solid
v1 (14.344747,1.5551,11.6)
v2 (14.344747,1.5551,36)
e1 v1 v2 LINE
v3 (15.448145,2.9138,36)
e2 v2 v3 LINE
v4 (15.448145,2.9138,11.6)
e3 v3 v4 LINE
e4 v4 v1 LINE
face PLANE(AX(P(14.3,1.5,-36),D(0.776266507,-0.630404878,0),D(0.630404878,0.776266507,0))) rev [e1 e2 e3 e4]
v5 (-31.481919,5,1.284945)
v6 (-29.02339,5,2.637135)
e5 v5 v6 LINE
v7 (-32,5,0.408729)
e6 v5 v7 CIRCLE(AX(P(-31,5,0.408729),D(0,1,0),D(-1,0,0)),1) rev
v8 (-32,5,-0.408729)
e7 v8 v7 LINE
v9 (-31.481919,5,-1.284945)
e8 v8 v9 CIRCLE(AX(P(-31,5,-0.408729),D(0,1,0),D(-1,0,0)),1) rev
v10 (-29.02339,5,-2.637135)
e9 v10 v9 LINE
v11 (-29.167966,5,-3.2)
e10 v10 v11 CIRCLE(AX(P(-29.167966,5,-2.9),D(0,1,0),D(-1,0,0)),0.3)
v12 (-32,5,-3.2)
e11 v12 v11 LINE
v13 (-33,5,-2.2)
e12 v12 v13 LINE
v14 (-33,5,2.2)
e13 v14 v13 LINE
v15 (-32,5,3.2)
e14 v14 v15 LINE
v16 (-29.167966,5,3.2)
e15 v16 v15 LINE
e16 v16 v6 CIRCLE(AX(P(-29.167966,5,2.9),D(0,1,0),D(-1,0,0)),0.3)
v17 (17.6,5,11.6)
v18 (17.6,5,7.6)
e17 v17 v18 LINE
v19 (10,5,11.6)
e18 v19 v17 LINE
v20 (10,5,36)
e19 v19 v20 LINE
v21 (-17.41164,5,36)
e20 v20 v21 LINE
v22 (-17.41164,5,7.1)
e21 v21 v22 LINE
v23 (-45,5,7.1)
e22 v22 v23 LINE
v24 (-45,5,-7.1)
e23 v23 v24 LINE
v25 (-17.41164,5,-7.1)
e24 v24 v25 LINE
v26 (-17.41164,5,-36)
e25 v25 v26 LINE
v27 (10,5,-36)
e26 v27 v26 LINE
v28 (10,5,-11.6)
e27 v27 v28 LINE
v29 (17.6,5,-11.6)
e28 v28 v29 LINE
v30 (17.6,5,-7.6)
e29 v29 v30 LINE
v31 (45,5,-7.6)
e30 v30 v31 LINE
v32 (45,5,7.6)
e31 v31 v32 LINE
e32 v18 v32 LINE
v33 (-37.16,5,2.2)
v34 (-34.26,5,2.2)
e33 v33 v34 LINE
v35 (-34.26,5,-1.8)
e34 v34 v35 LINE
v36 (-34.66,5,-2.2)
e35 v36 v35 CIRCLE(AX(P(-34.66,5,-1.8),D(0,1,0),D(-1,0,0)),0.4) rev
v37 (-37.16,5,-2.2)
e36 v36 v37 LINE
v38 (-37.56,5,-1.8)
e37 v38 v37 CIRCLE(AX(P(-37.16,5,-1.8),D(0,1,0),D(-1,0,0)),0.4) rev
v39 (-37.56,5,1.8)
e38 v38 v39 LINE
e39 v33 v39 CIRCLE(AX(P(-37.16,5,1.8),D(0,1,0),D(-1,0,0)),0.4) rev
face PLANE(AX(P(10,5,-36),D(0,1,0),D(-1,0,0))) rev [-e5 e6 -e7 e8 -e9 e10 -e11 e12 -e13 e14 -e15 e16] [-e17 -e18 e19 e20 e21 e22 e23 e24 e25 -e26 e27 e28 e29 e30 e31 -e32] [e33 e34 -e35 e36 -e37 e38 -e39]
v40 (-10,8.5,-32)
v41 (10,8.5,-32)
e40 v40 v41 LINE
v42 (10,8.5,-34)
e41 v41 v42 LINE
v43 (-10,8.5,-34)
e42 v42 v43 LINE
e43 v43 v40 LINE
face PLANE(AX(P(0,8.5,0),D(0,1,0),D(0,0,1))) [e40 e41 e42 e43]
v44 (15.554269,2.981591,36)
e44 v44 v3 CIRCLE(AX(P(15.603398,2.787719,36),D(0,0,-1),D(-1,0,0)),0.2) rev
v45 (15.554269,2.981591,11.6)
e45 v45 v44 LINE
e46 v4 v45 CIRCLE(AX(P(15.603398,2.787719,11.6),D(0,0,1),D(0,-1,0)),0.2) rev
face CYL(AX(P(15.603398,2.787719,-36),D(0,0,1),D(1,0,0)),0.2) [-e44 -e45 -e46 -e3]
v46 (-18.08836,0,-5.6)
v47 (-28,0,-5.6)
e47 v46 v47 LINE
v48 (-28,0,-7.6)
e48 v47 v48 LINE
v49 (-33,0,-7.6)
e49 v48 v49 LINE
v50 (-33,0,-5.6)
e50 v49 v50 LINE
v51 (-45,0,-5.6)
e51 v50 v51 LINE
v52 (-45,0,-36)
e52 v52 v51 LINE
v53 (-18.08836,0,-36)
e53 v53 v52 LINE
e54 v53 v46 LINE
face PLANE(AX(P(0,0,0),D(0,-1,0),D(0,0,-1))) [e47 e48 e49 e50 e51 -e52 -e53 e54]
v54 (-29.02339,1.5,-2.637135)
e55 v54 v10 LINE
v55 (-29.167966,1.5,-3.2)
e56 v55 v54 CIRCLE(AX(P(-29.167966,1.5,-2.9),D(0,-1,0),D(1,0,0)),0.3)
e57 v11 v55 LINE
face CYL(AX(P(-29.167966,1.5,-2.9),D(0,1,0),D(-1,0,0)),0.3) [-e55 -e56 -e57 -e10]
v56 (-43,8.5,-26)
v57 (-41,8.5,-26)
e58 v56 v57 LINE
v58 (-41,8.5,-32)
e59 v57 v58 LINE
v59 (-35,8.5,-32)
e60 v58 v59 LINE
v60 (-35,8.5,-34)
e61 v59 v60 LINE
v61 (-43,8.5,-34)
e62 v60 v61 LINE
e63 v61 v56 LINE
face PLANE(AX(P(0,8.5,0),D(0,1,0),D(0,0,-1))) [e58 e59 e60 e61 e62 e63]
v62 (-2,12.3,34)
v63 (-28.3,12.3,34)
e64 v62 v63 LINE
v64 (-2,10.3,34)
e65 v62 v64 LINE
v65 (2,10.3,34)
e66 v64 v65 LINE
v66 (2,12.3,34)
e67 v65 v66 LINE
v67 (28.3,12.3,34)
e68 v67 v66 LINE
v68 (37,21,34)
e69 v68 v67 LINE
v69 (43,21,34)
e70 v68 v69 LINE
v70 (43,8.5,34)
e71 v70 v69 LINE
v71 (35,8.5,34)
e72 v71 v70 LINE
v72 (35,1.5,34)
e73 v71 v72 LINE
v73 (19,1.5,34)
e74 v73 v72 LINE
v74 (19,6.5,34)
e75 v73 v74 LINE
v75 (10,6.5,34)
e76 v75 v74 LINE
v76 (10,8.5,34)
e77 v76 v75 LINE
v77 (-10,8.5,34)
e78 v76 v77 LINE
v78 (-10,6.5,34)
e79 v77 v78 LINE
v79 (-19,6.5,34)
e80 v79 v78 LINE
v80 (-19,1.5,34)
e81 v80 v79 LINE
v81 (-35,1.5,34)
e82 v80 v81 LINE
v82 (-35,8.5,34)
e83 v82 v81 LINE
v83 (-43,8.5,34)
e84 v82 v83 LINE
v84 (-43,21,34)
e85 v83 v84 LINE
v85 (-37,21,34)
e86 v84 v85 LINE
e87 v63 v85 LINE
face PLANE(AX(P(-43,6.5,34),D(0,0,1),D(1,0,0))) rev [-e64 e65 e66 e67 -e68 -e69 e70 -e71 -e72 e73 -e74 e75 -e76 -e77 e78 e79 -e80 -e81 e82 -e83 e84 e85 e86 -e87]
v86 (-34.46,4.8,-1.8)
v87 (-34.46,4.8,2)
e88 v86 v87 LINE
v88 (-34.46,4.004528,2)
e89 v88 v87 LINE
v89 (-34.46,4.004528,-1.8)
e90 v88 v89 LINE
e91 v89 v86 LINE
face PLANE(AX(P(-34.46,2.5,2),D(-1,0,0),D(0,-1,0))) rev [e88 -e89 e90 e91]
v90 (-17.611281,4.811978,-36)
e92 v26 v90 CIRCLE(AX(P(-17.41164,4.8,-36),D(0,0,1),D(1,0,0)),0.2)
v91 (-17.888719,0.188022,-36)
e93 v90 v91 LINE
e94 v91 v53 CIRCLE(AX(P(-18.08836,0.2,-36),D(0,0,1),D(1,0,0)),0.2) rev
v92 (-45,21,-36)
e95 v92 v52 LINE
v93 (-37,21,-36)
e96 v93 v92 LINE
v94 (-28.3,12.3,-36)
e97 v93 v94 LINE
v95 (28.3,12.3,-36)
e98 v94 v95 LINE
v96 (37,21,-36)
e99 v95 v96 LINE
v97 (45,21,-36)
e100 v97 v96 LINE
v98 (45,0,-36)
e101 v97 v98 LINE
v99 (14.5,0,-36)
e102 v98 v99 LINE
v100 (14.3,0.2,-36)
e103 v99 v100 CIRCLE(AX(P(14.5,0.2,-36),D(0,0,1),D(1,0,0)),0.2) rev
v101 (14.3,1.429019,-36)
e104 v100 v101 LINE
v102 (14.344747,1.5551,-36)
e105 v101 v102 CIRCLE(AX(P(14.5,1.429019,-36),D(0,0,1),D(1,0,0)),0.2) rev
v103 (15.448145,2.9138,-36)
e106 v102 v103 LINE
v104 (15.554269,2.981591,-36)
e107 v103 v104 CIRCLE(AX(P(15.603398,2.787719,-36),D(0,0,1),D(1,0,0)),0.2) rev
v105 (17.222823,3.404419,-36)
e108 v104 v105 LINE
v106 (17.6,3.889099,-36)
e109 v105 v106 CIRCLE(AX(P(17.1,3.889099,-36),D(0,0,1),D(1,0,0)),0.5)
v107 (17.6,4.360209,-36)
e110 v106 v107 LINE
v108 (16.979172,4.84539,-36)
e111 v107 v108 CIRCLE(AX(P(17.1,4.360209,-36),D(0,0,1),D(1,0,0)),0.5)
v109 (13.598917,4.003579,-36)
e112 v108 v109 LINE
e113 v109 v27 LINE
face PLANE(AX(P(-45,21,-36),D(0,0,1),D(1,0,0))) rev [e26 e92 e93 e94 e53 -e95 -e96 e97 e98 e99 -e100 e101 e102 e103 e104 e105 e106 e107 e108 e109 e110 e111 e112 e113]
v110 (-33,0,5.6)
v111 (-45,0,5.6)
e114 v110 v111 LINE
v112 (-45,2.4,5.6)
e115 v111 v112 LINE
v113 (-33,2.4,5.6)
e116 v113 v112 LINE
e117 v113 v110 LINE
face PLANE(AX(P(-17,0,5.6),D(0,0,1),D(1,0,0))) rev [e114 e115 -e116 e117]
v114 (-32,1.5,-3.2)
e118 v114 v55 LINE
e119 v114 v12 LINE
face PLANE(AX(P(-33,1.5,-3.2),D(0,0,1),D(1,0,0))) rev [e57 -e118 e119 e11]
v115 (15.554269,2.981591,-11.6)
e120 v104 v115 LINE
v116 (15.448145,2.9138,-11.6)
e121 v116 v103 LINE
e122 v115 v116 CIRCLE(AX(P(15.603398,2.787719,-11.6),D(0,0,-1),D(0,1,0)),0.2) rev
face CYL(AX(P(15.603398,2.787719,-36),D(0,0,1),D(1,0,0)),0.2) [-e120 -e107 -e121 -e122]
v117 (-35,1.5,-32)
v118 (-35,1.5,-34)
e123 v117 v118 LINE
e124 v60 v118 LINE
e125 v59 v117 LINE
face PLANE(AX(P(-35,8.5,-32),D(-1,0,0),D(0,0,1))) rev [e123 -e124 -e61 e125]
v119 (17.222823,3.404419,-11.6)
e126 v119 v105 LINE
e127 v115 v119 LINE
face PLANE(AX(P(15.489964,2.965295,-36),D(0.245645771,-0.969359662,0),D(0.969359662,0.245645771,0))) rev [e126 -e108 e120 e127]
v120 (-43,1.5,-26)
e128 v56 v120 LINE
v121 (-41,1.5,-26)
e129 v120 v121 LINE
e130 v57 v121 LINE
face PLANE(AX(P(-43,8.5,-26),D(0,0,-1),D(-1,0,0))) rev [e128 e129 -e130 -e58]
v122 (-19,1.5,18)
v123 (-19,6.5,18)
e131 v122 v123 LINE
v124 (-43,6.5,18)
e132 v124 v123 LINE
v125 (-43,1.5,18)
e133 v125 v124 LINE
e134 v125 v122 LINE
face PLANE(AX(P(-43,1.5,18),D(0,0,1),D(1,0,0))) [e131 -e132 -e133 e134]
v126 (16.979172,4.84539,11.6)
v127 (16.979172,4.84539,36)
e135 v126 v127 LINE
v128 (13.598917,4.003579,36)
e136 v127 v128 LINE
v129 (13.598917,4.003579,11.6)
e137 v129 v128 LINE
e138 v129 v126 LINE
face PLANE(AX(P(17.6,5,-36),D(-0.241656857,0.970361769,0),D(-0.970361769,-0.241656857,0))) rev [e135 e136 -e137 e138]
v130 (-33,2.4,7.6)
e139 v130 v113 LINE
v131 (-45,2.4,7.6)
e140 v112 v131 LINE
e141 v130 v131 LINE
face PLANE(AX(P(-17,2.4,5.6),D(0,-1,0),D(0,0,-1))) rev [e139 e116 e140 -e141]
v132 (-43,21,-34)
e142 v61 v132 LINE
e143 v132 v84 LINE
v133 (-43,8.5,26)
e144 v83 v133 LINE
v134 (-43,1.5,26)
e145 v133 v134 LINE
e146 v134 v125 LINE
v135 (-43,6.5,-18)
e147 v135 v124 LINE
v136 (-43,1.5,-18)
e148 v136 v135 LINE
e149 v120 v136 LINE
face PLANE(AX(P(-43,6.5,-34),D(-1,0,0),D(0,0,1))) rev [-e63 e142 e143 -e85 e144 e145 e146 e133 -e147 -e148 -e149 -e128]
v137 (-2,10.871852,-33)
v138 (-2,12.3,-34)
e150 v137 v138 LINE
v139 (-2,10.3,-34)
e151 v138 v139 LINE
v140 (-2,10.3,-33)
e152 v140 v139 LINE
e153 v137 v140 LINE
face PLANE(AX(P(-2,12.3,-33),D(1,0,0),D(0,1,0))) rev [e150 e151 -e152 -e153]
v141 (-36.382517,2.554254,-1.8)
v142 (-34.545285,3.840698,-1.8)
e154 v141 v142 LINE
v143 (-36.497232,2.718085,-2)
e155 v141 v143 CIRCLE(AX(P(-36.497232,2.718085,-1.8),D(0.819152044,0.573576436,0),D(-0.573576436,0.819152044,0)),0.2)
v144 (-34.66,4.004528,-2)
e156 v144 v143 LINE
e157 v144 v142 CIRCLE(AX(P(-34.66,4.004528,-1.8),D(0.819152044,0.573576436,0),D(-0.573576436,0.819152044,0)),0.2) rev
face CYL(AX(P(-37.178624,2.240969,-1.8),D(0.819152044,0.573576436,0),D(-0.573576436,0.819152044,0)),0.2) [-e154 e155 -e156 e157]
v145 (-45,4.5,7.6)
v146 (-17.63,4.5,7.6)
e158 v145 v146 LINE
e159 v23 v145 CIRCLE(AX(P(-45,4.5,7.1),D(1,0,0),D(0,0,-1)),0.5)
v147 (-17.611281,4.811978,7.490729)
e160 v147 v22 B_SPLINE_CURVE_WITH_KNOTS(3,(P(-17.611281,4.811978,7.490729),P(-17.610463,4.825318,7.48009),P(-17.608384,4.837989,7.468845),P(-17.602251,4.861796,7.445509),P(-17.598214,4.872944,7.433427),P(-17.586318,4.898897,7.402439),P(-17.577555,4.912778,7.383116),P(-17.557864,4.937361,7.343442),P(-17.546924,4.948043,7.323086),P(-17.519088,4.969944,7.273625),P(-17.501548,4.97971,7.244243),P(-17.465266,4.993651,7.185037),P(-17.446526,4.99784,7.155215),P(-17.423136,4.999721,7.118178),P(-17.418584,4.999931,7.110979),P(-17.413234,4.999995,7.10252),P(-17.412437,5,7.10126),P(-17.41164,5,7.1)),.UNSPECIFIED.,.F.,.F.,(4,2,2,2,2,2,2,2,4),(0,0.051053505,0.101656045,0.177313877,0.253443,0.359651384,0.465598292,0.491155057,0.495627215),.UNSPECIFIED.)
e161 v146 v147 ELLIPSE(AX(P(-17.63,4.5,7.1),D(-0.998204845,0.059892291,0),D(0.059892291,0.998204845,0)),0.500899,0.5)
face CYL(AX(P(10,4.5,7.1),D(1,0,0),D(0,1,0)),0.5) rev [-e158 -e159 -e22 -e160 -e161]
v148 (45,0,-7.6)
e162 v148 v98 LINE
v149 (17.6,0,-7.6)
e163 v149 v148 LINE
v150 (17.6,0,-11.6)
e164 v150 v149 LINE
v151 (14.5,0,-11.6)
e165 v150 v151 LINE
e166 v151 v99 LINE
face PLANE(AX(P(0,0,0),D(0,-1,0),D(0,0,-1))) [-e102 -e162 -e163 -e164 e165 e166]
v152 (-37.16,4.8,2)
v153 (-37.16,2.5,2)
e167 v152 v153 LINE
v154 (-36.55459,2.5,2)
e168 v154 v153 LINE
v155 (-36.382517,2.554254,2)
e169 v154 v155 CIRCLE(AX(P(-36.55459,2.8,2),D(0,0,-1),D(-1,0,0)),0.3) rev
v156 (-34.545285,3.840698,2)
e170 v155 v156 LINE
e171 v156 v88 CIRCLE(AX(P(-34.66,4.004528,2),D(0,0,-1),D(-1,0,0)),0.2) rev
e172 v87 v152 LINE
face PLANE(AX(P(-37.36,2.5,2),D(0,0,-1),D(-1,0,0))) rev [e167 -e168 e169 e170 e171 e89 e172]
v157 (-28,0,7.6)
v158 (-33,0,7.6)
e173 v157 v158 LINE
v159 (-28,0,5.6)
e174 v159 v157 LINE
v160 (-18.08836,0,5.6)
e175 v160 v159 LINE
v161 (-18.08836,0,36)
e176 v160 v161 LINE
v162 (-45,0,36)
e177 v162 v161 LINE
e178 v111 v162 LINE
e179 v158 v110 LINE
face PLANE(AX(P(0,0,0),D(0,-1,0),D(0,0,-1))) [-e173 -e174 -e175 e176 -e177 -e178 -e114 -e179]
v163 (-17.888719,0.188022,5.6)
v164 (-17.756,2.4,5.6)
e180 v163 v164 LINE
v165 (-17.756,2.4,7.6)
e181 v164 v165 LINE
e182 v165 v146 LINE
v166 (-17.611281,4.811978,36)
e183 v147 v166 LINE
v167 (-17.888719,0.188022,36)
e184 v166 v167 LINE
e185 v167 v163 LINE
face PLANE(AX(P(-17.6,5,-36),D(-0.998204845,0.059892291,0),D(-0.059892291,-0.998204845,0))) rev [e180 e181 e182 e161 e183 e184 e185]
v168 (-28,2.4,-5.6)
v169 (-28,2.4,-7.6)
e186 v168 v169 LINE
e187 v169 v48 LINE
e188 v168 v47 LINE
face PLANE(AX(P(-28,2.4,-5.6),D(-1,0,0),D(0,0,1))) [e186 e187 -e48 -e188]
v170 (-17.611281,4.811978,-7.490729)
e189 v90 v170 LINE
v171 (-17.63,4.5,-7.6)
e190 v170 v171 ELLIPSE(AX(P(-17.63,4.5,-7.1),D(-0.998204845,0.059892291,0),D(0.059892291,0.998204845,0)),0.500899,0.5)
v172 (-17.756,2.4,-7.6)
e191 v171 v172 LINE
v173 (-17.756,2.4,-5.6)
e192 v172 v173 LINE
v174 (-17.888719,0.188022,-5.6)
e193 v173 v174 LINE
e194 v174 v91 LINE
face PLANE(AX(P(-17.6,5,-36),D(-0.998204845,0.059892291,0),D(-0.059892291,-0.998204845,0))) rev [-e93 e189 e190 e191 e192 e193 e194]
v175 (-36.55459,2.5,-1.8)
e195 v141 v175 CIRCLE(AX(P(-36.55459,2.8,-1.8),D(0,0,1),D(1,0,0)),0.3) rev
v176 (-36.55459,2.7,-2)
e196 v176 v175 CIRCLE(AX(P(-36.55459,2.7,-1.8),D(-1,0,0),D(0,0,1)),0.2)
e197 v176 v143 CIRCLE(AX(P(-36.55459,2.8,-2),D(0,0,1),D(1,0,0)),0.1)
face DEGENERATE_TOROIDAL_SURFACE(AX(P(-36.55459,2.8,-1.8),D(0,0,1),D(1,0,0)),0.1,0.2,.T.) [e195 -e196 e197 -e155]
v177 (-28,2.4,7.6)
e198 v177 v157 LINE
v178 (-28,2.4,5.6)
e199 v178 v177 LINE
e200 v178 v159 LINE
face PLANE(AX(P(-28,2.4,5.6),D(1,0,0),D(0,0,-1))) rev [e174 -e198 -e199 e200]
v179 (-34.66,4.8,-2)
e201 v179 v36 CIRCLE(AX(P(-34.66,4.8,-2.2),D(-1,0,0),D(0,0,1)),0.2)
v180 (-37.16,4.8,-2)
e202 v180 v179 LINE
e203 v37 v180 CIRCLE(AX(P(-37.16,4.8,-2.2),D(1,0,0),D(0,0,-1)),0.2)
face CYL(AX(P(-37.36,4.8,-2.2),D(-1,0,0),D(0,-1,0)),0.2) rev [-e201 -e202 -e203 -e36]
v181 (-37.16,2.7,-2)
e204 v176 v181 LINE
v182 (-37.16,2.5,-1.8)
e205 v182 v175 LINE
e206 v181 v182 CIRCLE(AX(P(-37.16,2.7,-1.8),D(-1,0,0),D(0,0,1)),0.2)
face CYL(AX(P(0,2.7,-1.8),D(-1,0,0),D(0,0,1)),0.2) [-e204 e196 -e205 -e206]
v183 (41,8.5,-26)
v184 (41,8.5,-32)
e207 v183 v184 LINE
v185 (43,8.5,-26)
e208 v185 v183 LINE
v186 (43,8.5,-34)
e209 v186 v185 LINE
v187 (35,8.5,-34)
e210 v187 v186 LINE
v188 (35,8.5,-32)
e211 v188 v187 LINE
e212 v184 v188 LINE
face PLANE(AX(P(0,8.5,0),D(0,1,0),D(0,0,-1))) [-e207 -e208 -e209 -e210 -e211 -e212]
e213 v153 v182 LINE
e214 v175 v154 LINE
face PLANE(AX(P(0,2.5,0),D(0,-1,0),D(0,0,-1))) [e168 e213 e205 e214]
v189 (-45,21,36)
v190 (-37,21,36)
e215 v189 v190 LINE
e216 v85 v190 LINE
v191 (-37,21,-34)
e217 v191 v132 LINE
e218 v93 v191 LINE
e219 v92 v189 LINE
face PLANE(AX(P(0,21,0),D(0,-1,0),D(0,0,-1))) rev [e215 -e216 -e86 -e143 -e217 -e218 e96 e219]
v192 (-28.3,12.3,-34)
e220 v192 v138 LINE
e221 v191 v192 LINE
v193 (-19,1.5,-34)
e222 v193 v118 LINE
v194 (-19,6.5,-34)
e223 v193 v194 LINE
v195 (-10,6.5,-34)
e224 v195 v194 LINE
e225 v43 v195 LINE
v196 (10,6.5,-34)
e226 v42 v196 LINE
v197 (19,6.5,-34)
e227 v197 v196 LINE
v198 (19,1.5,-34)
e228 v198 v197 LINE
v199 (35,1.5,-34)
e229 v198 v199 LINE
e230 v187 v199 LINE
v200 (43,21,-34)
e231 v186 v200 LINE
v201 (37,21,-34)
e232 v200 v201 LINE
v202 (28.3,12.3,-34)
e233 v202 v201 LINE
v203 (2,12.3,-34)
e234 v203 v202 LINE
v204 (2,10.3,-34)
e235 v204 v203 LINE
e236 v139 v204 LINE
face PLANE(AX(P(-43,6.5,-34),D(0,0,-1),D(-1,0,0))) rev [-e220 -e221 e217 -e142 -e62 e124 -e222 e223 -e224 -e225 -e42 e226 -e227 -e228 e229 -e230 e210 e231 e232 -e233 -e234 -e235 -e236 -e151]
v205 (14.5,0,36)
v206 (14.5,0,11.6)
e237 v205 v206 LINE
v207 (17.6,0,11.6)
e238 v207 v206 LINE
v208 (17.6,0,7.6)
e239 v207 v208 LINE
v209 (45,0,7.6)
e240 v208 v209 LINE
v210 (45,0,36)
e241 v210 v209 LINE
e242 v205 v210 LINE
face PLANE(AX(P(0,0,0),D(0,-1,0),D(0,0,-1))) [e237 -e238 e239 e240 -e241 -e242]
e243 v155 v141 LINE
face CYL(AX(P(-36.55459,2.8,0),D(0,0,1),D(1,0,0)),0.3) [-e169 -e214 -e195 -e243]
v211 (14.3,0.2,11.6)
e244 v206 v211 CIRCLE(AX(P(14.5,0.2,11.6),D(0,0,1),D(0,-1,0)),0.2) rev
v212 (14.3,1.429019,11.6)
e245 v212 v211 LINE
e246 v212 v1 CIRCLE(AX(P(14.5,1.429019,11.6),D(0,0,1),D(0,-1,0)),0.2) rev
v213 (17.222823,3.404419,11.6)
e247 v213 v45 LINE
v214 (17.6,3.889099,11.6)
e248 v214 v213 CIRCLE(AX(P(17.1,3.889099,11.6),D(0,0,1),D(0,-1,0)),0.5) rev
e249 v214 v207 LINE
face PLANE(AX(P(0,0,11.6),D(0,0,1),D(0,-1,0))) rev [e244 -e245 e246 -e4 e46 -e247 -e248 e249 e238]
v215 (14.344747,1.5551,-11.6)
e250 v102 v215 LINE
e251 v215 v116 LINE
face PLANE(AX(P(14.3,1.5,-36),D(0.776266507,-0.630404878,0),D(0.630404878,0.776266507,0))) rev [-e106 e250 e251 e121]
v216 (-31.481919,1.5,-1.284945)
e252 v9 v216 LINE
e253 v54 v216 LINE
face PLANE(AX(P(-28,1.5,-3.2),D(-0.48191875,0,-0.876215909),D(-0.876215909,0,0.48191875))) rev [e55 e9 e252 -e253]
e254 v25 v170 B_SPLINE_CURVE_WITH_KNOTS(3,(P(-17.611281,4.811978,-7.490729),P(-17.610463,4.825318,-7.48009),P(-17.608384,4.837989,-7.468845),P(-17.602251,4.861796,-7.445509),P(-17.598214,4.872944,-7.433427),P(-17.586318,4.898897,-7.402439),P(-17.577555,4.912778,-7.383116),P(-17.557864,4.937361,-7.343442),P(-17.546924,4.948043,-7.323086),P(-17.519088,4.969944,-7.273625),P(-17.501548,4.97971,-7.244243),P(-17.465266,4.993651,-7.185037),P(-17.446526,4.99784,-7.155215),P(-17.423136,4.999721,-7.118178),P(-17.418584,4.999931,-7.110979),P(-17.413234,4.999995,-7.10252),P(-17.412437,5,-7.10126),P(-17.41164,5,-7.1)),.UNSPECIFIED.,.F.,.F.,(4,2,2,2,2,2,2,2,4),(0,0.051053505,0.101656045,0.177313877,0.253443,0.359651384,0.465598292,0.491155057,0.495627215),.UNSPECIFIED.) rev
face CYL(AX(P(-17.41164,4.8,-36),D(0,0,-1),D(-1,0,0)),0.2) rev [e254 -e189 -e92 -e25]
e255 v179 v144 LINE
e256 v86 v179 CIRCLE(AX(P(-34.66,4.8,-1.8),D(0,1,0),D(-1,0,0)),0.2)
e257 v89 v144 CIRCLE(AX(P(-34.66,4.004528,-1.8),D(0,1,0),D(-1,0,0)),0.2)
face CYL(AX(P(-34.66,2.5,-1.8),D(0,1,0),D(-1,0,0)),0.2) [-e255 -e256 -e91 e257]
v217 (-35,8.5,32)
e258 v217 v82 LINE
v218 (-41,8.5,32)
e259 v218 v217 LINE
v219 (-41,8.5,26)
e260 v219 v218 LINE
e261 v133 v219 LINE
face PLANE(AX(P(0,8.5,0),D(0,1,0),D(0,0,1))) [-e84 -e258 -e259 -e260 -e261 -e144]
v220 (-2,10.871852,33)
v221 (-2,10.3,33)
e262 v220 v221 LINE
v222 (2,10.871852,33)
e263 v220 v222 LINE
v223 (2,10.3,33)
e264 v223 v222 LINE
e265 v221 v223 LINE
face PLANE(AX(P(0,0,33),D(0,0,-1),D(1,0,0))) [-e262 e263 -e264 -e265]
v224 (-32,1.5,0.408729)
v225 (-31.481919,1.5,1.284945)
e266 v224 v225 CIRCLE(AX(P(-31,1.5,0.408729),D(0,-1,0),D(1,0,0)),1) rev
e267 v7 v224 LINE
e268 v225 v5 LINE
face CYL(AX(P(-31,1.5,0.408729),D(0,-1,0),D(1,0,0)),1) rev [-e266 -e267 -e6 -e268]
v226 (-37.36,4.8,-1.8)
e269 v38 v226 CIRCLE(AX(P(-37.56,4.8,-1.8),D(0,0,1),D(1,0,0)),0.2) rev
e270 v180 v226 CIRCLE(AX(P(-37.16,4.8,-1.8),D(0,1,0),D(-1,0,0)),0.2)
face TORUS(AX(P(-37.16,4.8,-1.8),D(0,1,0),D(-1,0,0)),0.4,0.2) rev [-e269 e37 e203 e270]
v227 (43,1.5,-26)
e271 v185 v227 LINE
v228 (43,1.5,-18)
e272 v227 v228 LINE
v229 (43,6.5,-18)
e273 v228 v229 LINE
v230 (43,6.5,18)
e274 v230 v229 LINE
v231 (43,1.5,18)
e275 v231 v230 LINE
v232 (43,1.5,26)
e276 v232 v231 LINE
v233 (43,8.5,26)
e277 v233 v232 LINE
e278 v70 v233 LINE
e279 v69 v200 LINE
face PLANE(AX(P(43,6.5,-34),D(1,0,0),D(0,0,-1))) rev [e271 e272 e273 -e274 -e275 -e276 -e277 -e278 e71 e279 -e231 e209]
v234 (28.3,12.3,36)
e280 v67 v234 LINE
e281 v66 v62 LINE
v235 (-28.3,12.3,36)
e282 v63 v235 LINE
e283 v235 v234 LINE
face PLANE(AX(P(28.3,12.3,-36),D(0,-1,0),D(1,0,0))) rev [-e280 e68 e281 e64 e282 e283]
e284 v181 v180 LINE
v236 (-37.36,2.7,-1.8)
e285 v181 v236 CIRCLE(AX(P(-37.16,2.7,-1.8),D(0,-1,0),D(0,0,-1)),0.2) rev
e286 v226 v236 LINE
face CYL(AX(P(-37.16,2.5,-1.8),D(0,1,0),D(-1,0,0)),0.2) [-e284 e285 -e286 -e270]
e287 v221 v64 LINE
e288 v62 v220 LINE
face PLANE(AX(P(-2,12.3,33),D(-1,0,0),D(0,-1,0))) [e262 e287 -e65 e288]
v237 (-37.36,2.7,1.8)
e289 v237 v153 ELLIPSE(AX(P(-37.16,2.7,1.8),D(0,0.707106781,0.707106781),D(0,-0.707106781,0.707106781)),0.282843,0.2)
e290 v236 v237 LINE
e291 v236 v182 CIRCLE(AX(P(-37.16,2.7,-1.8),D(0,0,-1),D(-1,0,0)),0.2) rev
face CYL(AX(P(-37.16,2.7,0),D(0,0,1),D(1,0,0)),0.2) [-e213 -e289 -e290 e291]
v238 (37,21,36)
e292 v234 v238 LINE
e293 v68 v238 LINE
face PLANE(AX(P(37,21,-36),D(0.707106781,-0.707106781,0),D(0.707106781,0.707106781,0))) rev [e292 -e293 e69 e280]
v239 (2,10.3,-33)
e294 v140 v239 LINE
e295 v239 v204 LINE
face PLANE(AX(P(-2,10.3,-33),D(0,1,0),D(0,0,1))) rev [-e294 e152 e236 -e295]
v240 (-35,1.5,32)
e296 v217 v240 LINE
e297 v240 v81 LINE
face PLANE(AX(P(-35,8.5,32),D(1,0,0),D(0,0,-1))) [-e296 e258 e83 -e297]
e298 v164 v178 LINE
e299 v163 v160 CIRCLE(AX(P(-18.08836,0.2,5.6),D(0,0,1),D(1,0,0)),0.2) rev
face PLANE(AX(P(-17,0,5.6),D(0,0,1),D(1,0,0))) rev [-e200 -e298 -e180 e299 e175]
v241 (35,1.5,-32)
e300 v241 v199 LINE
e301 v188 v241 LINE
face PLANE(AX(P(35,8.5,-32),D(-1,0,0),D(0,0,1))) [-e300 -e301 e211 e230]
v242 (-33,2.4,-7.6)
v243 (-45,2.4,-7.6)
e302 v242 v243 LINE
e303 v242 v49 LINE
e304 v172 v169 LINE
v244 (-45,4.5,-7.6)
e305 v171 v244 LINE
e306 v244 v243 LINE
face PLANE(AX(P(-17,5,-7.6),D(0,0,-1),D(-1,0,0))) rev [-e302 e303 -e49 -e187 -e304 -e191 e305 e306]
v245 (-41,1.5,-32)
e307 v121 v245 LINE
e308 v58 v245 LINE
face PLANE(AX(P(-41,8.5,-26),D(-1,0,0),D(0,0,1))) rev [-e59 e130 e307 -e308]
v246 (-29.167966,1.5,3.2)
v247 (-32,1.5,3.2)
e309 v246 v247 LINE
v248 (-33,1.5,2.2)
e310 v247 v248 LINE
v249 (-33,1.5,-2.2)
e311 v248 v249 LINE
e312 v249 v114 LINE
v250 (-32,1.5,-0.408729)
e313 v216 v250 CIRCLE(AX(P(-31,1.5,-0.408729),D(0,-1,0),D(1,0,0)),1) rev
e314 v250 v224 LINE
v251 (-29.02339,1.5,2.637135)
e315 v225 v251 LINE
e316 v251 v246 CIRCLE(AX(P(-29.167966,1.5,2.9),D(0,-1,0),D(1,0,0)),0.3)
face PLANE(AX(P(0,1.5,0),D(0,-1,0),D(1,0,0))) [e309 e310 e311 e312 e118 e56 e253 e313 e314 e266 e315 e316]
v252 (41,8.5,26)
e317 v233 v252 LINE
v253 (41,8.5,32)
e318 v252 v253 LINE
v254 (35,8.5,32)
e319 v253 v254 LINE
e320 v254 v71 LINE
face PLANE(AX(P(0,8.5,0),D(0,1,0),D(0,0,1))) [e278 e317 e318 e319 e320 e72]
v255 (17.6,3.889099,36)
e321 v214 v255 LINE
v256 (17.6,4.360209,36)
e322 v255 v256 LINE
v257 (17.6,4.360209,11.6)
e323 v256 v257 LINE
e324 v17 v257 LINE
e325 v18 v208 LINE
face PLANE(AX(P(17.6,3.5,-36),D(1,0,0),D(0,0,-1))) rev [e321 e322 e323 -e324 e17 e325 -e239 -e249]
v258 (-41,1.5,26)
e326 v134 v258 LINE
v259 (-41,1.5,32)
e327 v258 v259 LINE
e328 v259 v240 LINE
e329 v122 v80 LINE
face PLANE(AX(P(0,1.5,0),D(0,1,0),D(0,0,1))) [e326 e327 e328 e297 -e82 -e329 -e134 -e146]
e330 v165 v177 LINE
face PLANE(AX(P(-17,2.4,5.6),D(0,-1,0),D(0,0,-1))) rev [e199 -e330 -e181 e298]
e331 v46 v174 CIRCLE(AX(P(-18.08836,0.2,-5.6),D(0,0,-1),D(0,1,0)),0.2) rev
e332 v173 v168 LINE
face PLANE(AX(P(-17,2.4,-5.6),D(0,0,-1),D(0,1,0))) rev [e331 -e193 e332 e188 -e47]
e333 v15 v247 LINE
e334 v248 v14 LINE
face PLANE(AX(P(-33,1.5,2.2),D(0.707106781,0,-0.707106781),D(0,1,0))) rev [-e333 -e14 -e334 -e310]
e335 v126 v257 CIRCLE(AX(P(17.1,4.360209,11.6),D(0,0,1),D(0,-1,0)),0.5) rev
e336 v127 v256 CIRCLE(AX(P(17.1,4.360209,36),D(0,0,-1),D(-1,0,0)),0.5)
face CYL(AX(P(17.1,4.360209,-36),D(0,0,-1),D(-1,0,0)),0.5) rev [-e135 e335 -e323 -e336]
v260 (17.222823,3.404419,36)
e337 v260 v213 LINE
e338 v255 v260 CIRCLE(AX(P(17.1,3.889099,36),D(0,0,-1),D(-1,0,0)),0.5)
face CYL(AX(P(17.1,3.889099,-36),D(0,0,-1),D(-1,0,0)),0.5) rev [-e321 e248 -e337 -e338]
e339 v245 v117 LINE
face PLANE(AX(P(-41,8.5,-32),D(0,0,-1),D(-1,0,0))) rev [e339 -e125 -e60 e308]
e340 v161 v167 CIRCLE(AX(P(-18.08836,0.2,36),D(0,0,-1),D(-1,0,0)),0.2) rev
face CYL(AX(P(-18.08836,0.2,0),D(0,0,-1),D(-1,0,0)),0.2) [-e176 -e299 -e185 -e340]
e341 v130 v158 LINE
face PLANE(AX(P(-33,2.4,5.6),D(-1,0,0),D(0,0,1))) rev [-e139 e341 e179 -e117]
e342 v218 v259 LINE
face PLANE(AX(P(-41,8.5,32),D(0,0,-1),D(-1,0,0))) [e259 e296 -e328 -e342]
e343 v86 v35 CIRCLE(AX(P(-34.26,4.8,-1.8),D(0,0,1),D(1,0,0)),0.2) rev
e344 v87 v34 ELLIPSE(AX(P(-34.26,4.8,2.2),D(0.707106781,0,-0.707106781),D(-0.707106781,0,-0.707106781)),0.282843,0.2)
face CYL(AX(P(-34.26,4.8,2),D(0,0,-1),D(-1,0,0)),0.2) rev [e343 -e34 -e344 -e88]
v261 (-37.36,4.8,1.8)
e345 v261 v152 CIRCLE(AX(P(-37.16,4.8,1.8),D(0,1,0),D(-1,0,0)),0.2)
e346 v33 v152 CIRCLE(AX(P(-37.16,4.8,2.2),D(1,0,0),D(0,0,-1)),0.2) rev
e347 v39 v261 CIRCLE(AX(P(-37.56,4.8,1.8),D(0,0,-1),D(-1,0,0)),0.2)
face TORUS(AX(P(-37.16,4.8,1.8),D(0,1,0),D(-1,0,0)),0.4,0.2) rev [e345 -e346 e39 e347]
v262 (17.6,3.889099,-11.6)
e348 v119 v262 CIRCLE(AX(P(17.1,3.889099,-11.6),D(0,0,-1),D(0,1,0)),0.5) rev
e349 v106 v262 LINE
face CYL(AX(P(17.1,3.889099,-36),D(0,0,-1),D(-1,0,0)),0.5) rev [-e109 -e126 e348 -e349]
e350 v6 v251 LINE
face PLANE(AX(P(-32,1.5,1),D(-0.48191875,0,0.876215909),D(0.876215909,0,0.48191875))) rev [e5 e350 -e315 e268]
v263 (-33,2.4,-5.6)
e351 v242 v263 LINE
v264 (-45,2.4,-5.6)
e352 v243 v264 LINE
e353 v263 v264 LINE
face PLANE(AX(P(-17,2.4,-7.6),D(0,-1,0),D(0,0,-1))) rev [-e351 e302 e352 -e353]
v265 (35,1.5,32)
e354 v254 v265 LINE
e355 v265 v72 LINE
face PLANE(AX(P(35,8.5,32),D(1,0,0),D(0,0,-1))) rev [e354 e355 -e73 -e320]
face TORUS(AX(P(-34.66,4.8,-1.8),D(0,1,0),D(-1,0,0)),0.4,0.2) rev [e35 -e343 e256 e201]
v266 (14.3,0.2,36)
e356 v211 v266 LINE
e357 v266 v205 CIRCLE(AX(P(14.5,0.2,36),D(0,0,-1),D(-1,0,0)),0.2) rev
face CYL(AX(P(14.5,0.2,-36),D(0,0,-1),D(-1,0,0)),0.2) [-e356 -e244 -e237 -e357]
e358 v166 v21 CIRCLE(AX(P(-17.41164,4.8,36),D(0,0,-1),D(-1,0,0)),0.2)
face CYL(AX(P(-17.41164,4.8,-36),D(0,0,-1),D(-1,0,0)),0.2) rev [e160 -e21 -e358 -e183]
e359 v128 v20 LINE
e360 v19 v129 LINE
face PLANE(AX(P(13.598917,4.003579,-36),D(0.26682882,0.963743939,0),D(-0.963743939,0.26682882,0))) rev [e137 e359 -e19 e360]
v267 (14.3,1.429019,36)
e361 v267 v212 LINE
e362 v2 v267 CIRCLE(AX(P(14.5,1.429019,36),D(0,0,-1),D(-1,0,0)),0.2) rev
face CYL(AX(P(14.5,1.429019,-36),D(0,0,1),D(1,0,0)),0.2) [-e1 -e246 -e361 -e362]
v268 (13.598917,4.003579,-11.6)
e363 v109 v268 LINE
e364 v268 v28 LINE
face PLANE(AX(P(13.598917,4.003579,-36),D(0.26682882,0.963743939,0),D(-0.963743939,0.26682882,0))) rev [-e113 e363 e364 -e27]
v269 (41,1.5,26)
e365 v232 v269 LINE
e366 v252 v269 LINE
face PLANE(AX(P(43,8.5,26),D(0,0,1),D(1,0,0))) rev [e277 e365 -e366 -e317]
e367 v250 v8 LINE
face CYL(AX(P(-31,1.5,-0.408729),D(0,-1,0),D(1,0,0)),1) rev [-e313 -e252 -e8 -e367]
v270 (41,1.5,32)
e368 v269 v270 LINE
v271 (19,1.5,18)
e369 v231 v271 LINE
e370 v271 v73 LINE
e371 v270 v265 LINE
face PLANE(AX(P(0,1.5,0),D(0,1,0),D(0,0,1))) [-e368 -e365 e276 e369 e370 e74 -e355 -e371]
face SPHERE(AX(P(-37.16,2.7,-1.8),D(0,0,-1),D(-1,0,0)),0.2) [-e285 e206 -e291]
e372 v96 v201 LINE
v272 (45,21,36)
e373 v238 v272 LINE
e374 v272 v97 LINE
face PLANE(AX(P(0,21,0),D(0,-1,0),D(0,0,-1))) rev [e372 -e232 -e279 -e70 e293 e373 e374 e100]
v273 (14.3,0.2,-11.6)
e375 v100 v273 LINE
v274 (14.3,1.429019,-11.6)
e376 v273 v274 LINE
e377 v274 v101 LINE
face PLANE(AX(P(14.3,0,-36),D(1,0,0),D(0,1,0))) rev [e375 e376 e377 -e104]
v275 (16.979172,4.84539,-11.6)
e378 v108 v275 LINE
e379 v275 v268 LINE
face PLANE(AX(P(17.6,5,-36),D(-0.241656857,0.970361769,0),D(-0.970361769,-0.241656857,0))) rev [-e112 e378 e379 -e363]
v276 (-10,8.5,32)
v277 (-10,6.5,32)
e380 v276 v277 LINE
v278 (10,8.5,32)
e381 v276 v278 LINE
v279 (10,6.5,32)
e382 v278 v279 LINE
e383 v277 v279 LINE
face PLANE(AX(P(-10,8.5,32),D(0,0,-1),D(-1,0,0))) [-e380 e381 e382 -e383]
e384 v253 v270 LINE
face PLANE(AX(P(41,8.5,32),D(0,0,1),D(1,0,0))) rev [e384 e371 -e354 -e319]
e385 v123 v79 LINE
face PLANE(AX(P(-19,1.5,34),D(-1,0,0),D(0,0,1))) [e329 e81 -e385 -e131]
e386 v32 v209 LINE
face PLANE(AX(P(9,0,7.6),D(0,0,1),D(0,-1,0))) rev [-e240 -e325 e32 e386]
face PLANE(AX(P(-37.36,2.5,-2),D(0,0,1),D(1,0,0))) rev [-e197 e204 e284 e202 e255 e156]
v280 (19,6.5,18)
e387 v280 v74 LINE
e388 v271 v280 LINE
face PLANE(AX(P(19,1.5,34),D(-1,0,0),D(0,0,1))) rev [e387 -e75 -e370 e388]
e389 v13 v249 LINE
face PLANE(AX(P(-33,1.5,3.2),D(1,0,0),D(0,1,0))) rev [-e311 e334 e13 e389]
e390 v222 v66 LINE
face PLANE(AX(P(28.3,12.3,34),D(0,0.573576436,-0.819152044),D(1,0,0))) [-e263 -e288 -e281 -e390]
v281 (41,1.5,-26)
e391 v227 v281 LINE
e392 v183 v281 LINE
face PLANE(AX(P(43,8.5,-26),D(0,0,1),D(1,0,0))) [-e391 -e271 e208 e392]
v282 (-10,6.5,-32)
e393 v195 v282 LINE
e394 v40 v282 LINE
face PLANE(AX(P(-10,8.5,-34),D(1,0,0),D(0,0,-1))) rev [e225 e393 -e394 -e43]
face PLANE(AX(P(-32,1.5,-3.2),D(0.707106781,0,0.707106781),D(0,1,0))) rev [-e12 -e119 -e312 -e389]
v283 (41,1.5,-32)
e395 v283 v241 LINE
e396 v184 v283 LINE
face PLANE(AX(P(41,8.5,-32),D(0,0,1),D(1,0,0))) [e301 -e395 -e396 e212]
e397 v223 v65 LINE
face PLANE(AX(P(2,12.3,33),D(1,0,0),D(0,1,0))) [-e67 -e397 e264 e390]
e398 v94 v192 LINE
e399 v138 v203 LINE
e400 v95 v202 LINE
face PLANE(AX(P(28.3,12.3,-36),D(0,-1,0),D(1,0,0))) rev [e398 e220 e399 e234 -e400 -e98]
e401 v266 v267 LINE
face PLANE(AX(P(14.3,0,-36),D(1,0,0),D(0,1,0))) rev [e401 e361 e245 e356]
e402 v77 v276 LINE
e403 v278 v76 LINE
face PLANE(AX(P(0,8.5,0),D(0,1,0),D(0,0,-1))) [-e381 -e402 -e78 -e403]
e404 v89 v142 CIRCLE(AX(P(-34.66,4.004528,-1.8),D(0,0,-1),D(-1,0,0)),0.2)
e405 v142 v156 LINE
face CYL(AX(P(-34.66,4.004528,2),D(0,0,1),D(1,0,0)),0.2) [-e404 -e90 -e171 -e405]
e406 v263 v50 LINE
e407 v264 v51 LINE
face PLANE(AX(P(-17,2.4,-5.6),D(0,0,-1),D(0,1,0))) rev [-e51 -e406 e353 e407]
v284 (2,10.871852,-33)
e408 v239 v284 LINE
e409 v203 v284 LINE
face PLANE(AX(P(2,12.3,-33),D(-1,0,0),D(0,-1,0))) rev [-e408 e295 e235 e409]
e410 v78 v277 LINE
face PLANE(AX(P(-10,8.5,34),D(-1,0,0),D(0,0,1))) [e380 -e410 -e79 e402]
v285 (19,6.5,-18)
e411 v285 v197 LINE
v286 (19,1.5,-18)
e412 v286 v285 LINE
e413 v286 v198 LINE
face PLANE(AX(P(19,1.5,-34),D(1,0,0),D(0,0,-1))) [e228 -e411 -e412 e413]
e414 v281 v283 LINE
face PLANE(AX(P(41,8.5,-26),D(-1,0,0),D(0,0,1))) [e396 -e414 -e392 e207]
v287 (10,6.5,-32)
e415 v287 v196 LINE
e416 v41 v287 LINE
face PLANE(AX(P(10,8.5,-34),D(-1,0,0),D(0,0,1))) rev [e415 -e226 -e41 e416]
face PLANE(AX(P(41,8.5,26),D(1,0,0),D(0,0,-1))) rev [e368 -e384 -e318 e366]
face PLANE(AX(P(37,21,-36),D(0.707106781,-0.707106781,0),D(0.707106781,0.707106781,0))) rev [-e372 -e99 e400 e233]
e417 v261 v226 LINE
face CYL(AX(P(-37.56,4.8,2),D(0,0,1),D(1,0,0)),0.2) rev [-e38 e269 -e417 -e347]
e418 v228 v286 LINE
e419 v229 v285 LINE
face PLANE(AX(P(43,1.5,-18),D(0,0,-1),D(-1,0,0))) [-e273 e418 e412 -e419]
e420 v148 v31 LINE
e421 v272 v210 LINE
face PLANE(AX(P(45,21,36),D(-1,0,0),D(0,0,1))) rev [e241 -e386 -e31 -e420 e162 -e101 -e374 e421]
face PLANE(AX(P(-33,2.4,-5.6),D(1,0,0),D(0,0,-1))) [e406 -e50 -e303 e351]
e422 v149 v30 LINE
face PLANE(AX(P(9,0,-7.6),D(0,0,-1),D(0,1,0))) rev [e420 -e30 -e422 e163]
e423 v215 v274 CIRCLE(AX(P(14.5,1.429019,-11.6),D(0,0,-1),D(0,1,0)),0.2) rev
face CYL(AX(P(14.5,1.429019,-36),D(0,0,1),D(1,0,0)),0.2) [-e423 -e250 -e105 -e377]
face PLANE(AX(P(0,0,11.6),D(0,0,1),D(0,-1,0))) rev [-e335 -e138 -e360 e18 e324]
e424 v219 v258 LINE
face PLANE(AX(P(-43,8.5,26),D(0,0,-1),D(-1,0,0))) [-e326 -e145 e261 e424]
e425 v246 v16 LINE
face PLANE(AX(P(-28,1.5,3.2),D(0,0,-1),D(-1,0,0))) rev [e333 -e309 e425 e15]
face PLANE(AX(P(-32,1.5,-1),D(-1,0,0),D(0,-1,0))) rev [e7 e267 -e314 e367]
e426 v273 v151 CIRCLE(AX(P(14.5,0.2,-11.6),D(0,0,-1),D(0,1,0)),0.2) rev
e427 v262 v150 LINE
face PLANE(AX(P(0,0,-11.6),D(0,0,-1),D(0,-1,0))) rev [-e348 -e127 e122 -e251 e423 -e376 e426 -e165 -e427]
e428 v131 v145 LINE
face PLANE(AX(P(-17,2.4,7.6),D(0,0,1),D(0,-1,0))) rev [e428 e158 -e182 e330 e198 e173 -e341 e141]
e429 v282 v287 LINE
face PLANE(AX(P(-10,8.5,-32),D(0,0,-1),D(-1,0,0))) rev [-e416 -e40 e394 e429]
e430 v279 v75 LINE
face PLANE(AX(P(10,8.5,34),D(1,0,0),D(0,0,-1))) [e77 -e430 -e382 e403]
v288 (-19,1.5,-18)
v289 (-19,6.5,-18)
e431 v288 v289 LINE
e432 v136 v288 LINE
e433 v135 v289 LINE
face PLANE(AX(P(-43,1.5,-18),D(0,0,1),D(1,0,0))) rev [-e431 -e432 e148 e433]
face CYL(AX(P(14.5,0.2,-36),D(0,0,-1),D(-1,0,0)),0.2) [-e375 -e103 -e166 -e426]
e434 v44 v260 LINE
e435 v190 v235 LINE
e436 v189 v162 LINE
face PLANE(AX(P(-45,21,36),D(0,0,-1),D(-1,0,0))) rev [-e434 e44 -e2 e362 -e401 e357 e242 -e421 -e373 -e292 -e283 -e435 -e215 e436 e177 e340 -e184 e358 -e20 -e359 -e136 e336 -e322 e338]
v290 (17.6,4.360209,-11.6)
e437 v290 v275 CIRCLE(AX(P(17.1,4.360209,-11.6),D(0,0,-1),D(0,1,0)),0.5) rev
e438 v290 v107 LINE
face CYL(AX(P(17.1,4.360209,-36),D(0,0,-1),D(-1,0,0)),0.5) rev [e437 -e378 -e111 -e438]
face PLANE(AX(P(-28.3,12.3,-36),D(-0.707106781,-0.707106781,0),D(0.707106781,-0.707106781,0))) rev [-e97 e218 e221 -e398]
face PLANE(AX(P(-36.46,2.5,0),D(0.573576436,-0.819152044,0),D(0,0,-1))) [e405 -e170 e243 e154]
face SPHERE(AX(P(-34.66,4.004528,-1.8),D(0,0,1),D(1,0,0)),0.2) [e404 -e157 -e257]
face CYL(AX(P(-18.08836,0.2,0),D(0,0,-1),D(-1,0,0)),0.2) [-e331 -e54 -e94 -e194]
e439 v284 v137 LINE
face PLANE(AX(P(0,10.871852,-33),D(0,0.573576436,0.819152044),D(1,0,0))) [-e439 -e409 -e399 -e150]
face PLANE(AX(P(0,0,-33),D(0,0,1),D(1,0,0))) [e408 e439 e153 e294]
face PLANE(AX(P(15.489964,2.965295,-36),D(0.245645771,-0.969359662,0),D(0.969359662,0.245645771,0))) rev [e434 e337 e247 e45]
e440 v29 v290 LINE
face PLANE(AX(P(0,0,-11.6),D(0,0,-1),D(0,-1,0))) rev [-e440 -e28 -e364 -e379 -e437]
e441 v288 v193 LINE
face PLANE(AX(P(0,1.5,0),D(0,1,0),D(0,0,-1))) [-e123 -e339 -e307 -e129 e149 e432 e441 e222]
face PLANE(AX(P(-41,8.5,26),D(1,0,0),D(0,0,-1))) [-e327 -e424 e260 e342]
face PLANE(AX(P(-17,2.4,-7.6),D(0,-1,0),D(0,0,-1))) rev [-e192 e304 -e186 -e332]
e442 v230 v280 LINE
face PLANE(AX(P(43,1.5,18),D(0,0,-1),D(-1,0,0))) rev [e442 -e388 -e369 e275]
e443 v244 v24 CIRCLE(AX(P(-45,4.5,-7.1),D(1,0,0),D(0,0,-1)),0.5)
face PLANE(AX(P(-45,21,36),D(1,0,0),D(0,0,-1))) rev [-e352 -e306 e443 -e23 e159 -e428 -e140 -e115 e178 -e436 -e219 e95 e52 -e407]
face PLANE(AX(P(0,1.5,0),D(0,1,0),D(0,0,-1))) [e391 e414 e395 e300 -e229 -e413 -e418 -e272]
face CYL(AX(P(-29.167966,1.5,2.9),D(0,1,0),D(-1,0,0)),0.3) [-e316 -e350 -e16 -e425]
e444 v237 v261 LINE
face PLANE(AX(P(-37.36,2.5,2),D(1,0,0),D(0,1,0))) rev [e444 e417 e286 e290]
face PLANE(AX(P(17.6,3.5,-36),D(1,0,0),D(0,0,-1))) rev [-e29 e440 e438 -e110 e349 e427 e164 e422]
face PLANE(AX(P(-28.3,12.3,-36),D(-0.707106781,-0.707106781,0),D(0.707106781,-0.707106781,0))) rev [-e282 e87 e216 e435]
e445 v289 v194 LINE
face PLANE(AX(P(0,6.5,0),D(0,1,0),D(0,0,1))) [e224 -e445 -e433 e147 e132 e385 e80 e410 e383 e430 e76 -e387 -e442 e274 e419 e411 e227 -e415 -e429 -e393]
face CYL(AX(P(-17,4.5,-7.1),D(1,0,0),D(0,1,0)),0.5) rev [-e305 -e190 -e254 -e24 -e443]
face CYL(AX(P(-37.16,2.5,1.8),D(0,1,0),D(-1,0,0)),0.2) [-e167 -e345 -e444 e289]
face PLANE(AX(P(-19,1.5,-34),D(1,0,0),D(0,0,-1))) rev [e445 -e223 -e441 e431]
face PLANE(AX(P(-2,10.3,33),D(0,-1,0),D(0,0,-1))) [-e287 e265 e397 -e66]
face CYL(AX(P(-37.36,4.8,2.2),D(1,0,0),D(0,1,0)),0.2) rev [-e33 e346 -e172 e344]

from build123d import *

# Parameters (mm, degrees)
SKETCH_1_W                  = 90
SKETCH_1_H                  = 72
EXTRUDE_1_DEPTH             = 21
CUT_EXTRUDE_1_DEPTH         = 72
FILLET_1_R                  = 0.5
FILLET_2_R                  = 0.2
CUT_EXTRUDE_2_DEPTH         = 28
SKETCH_6_W                  = 5
SKETCH_6_H                  = 2
CUT_EXTRUDE_3_DEPTH         = 2.4
FILLET_3_R                  = 0.5
EXTRUDE_2_DEPTH             = 3.5
FILLET_4_R                  = 1
FILLET_5_R                  = 0.3
CHAMFER_1_SIZE              = 1
SKETCH_8_W                  = 2.9
SKETCH_8_H                  = 4
EXTRUDE_3_DEPTH             = 2.5
CHAMFER_2_SIZE              = 2
CHAMFER_2_SIZE2             = 1.400415076
FILLET_6_R                  = 0.2
FILLET_7_R                  = 0.3
FILLET_8_R                  = 0.2
SKETCH_9_W                  = 15.2
SKETCH_9_H                  = 5
CUT_EXTRUDE_4_DEPTH         = 36
SKETCH_10_W                 = 7.6
SKETCH_10_H                 = 5
CUT_EXTRUDE_5_DEPTH         = 4
CUT_EXTRUDE_6_DEPTH         = 72
SKETCH_12_W                 = 86
SKETCH_12_H                 = 68
CUT_EXTRUDE_7_DEPTH         = 14.5
SKETCH_13_W                 = 24
SKETCH_13_H                 = 16
CUT_EXTRUDE_8_DEPTH         = 5
MIRROR_4_COPY_1_SKETCH_W    = 24
MIRROR_4_COPY_1_SKETCH_H    = 16
MIRROR_4_COPY_1_DEPTH       = 5
EXTRUDE_4_DEPTH             = 7
MIRROR_6_COPY_1_DEPTH       = 7
SKETCH_15_W                 = 20
SKETCH_15_H                 = 2
EXTRUDE_5_DEPTH             = 2
SKETCH_17_W                 = 4
SKETCH_17_H                 = 2
EXTRUDE_6_DEPTH             = 1
CHAMFER_3_SIZE              = 1
CHAMFER_3_SIZE2             = 1.428148007
CHAMFER_3_OF_MIRROR_8_SIZE2 = 1.428148007
CHAMFER_3_OF_MIRROR_8_SIZE  = 1


with BuildPart() as part:
    # 草图1 → 凸台-拉伸1 (new body)
    with BuildSketch(Plane(origin=(0, 0, 0), x_dir=(1, 0, 0), z_dir=(0, 1, 0))):
        Rectangle(SKETCH_1_W, SKETCH_1_H)
    extrude(amount=EXTRUDE_1_DEPTH)

    # 草图4 → 切除-拉伸1 (cut)
    with BuildSketch(Plane.XY.offset(36)):
        Polygon((14.3, 0), (14.3, 1.5), (15.489963906, 2.965295015), (17.6, 3.5), (17.6, 5), (13.598917425, 4.003578801), (10, 5), (-17.6, 5), (-17.9, 0), align=None)
    extrude(amount=-CUT_EXTRUDE_1_DEPTH, mode=Mode.SUBTRACT)

    # 圆角1
    fillet_1_edges = [part.edges().sort_by_distance(p)[0] for p in [
        (17.6, 5, 0),
        (17.6, 3.5, 0),
    ]]
    fillet(fillet_1_edges, radius=FILLET_1_R)

    # 圆角2
    fillet_2_edges = [part.edges().sort_by_distance(p)[0] for p in [
        (14.3, 0, 0),
        (-17.9, 0, 0),
        (-17.6, 5, 0),
        (15.489963906, 2.965295015, 0),
        (14.3, 1.5, 0),
    ]]
    fillet(fillet_2_edges, radius=FILLET_2_R)

    # 草图5 → 切除-拉伸2 (cut)
    with BuildSketch(Plane.ZY.offset(45)):
        Polygon((5.6, 0), (5.6, 2.4), (7.6, 2.4), (7.6, 5), (-7.6, 5), (-7.6, 2.4), (-5.6, 2.4), (-5.6, 0), align=None)
    extrude(amount=-CUT_EXTRUDE_2_DEPTH, mode=Mode.SUBTRACT)

    # 草图6 → 切除-拉伸3 (cut)
    with BuildSketch(Plane.XZ):
        with Locations((-30.5, 6.6)):
            Rectangle(SKETCH_6_W, SKETCH_6_H)
    cut_extrude_3 = extrude(amount=-CUT_EXTRUDE_3_DEPTH, mode=Mode.SUBTRACT)

    # 镜向1: 切除-拉伸3 across plane
    add(cut_extrude_3.mirror(Plane(origin=(0, 0, 0), x_dir=(1, 0, 0), z_dir=(0, 0, -1))), mode=Mode.SUBTRACT)

    # 圆角3
    fillet_3_edges = [part.edges().sort_by_distance(p)[0] for p in [
        (-31.205820162, 5, -7.6),
        (-31.205820162, 5, 7.6),
    ]]
    fillet(fillet_3_edges, radius=FILLET_3_R)

    # 草图7 → 凸台-拉伸2 (add)
    with BuildSketch(Plane.XZ.offset(-5)):
        Polygon((-33, 3.2), (-33, -3.2), (-28, -3.2), (-32, -1), (-32, 1), (-28, 3.2), align=None)
    extrude(amount=EXTRUDE_2_DEPTH)

    # 圆角4
    fillet_4_edges = [part.edges().sort_by_distance(p)[0] for p in [
        (-32, 3.25, -1),
        (-32, 3.25, 1),
    ]]
    fillet(fillet_4_edges, radius=FILLET_4_R)

    # 圆角5
    fillet_5_edges = [part.edges().sort_by_distance(p)[0] for p in [
        (-28, 3.25, 3.2),
        (-28, 3.25, -3.2),
    ]]
    fillet(fillet_5_edges, radius=FILLET_5_R)

    # 倒角1
    chamfer_1_edges = [part.edges().sort_by_distance(p)[0] for p in [
        (-33, 3.25, 3.2),
        (-33, 3.25, -3.2),
    ]]
    chamfer(chamfer_1_edges, length=CHAMFER_1_SIZE)

    # 草图8 → 凸台-拉伸3 (add)
    with BuildSketch(Plane.XZ.offset(-5)):
        with Locations((-35.91, 0)):
            Rectangle(SKETCH_8_W, SKETCH_8_H)
    extrude(amount=EXTRUDE_3_DEPTH)

    # 倒角2
    chamfer_2_edges = [part.edges().sort_by_distance(p)[0] for p in [
        (-34.46, 2.5, 0),
    ]]
    chamfer_2_side = [part.faces().sort_by_distance(p)[0] for p in [
        (-35.91, 2.5, 0),
    ]]
    chamfer(chamfer_2_edges, length=CHAMFER_2_SIZE, length2=CHAMFER_2_SIZE2, reference=chamfer_2_side[0])

    # 圆角6
    fillet_6_edges = [part.edges().sort_by_distance(p)[0] for p in [
        (-37.36, 5, 0),
        (-37.36, 3.75, 2),
        (-35.91, 5, -2),
        (-37.36, 3.75, -2),
        (-34.46, 5, 0),
        (-35.91, 5, 2),
        (-37.36, 2.5, 0),
        (-36.91, 2.5, -2),
        (-34.46, 4.450207538, -2),
        (-35.46, 3.200207538, -2),
    ]]
    fillet(fillet_6_edges, radius=FILLET_6_R)

    # 圆角7
    # the kernel refuses this fillet: 0.3 mm, written as the material it takes off along each edge
    with BuildSketch(Plane(origin=(-36.554589637, 2.8, -2), x_dir=(0.5735764363510475, -0.8191520442889909, 0), z_dir=(0.8191520442889909, 0.5735764363510475, 0))) as fillet_7_piece_1:
        with BuildLine():
            CenterArc((0.1, -0.2), 0.2, 0, 90)
            Line((0.3, -0.2), (0.3, 0))
            Line((0.3, 0), (0.1, 0))
        make_face()
    revolve(axis=Axis((-36.554589637, 2.8, -2), (0, 0, -1)), revolution_arc=35, mode=Mode.SUBTRACT)
    with BuildSketch(Plane(origin=(-36.46, 2.5, 2.236474092), x_dir=(0.8191520442890007, 0.5735764363510335, 0), z_dir=(0, 0, -1))) as fillet_7_piece_2:
        with BuildLine():
            CenterArc((FILLET_7_R * 0.315298788879, -FILLET_7_R), FILLET_7_R, 90, 35)
            Line((-FILLET_7_R * 0.258277647472, -FILLET_7_R * 0.180847955711), (0, 0))
            Line((0, 0), (FILLET_7_R * 0.315298788879, 0))
        make_face()
    extrude(amount=4.236474092, mode=Mode.SUBTRACT)

    # 圆角8
    fillet_8_edges = [part.edges().sort_by_distance(p)[0] for p in [
        (-34.46, 3.900415076, 0.1),
        (-34.522857251, 3.93313649, -1.945574265),
    ]]
    fillet(fillet_8_edges, radius=FILLET_8_R)

    # 草图9 → 切除-拉伸4 (cut)
    with BuildSketch(Plane(origin=(45, 0, 0), x_dir=(0, 0, -1), z_dir=(1, 0, 0))):
        with Locations((0, 2.5)):
            Rectangle(SKETCH_9_W, SKETCH_9_H)
    extrude(amount=-CUT_EXTRUDE_4_DEPTH, mode=Mode.SUBTRACT)

    # 草图10 → 切除-拉伸5 (cut)
    with BuildSketch(Plane(origin=(0, 0, 7.6), x_dir=(-1, 0, 0), z_dir=(0, 0, -1))):
        with Locations((-13.8, 2.5)):
            Rectangle(SKETCH_10_W, SKETCH_10_H)
    cut_extrude_5 = extrude(amount=-CUT_EXTRUDE_5_DEPTH, mode=Mode.SUBTRACT)

    # 镜向2: 切除-拉伸5 across plane
    add(cut_extrude_5.mirror(Plane(origin=(0, 0, 0), x_dir=(1, 0, 0), z_dir=(0, 0, -1))), mode=Mode.SUBTRACT)

    # 草图11 → 切除-拉伸6 (cut)
    with BuildSketch(Plane.XY.offset(36)):
        Polygon((-37, 21), (37, 21), (28.3, 12.3), (-28.3, 12.3), align=None)
    extrude(amount=-CUT_EXTRUDE_6_DEPTH, mode=Mode.SUBTRACT)

    # 草图12 → 切除-拉伸7 (cut)
    with BuildSketch(Plane(origin=(0, 21, 0), x_dir=(1, 0, 0), z_dir=(0, 1, 0))):
        Rectangle(SKETCH_12_W, SKETCH_12_H)
    extrude(amount=-CUT_EXTRUDE_7_DEPTH, mode=Mode.SUBTRACT)

    # 草图13 → 切除-拉伸8 (cut)
    with BuildSketch(Plane(origin=(0, 6.5, 0), x_dir=(1, 0, 0), z_dir=(0, 1, 0))):
        with Locations((31, -26)):
            Rectangle(SKETCH_13_W, SKETCH_13_H)
    cut_extrude_8 = extrude(amount=-CUT_EXTRUDE_8_DEPTH, mode=Mode.SUBTRACT)

    # 镜向3: 切除-拉伸8 across plane
    add(cut_extrude_8.mirror(Plane(origin=(0, 0, 0), x_dir=(1, 0, 0), z_dir=(0, 0, -1))), mode=Mode.SUBTRACT)

    # 镜向4: 切除-拉伸8 across plane
    add(cut_extrude_8.mirror(Plane.ZY), mode=Mode.SUBTRACT)

    # 镜向4 copy 1 sketch → 镜向4 copy 1 (cut)
    with BuildSketch(Plane(origin=(0, 6.5, 0), x_dir=(-1, 0, 0), z_dir=(0, 1, 0))):
        with Locations((31, -26)):
            Rectangle(MIRROR_4_COPY_1_SKETCH_W, MIRROR_4_COPY_1_SKETCH_H)
    extrude(amount=-MIRROR_4_COPY_1_DEPTH, mode=Mode.SUBTRACT)

    # 草图14 → 凸台-拉伸4 (add)
    with BuildSketch(Plane(origin=(0, 1.5, 0), x_dir=(1, 0, 0), z_dir=(0, 1, 0))):
        Polygon((35, -34), (43, -34), (43, -26), (41, -26), (41, -32), (35, -32), align=None)
    extrude_4 = extrude(amount=EXTRUDE_4_DEPTH)

    # 镜向5: 凸台-拉伸4 across plane
    add(extrude_4.mirror(Plane(origin=(0, 0, 0), x_dir=(1, 0, 0), z_dir=(0, 0, -1))))

    # 镜向6: 凸台-拉伸4 across plane
    add(extrude_4.mirror(Plane.ZY))

    # 镜向6 copy 1 sketch → 镜向6 copy 1 (add)
    with BuildSketch(Plane(origin=(0, 1.5, 0), x_dir=(-1, 0, 0), z_dir=(0, 1, 0))):
        Polygon((35, -34), (43, -34), (43, -26), (41, -26), (41, -32), (35, -32), align=None)
    extrude(amount=MIRROR_6_COPY_1_DEPTH)

    # 草图15 → 凸台-拉伸5 (add)
    with BuildSketch(Plane(origin=(0, 6.5, 0), x_dir=(1, 0, 0), z_dir=(0, 1, 0))):
        with Locations((0, 33)):
            Rectangle(SKETCH_15_W, SKETCH_15_H)
    extrude_5 = extrude(amount=EXTRUDE_5_DEPTH)

    # 镜向7: 凸台-拉伸5 across plane
    add(extrude_5.mirror(Plane(origin=(0, 0, 0), x_dir=(1, 0, 0), z_dir=(0, 0, -1))))

    # 草图17 → 凸台-拉伸6 (add)
    with BuildSketch(Plane.XY.offset(-34)):
        with Locations((0, 11.3)):
            Rectangle(SKETCH_17_W, SKETCH_17_H)
    extrude_6 = extrude(amount=EXTRUDE_6_DEPTH)

    # 倒角3
    chamfer_3_edges = [part.edges().sort_by_distance(p)[0] for p in [
        (0, 12.3, -33),
    ]]
    chamfer_3_side = [part.faces().sort_by_distance(p)[0] for p in [
        (0, 12.3, -34.948805461),
    ]]
    chamfer(chamfer_3_edges, length=CHAMFER_3_SIZE, length2=CHAMFER_3_SIZE2, reference=chamfer_3_side[0])

    # 镜向8: 凸台-拉伸6 across plane
    add(extrude_6.mirror(Plane(origin=(0, 0, 0), x_dir=(1, 0, 0), z_dir=(0, 0, -1))))

    # 倒角3 of 镜向8
    chamfer_3_of_mirror_8_edges = [part.edges().sort_by_distance(p)[0] for p in [
        (0, 12.3, 33),
    ]]
    chamfer(chamfer_3_of_mirror_8_edges, length=CHAMFER_3_OF_MIRROR_8_SIZE, length2=CHAMFER_3_OF_MIRROR_8_SIZE2)


solid = part.part
